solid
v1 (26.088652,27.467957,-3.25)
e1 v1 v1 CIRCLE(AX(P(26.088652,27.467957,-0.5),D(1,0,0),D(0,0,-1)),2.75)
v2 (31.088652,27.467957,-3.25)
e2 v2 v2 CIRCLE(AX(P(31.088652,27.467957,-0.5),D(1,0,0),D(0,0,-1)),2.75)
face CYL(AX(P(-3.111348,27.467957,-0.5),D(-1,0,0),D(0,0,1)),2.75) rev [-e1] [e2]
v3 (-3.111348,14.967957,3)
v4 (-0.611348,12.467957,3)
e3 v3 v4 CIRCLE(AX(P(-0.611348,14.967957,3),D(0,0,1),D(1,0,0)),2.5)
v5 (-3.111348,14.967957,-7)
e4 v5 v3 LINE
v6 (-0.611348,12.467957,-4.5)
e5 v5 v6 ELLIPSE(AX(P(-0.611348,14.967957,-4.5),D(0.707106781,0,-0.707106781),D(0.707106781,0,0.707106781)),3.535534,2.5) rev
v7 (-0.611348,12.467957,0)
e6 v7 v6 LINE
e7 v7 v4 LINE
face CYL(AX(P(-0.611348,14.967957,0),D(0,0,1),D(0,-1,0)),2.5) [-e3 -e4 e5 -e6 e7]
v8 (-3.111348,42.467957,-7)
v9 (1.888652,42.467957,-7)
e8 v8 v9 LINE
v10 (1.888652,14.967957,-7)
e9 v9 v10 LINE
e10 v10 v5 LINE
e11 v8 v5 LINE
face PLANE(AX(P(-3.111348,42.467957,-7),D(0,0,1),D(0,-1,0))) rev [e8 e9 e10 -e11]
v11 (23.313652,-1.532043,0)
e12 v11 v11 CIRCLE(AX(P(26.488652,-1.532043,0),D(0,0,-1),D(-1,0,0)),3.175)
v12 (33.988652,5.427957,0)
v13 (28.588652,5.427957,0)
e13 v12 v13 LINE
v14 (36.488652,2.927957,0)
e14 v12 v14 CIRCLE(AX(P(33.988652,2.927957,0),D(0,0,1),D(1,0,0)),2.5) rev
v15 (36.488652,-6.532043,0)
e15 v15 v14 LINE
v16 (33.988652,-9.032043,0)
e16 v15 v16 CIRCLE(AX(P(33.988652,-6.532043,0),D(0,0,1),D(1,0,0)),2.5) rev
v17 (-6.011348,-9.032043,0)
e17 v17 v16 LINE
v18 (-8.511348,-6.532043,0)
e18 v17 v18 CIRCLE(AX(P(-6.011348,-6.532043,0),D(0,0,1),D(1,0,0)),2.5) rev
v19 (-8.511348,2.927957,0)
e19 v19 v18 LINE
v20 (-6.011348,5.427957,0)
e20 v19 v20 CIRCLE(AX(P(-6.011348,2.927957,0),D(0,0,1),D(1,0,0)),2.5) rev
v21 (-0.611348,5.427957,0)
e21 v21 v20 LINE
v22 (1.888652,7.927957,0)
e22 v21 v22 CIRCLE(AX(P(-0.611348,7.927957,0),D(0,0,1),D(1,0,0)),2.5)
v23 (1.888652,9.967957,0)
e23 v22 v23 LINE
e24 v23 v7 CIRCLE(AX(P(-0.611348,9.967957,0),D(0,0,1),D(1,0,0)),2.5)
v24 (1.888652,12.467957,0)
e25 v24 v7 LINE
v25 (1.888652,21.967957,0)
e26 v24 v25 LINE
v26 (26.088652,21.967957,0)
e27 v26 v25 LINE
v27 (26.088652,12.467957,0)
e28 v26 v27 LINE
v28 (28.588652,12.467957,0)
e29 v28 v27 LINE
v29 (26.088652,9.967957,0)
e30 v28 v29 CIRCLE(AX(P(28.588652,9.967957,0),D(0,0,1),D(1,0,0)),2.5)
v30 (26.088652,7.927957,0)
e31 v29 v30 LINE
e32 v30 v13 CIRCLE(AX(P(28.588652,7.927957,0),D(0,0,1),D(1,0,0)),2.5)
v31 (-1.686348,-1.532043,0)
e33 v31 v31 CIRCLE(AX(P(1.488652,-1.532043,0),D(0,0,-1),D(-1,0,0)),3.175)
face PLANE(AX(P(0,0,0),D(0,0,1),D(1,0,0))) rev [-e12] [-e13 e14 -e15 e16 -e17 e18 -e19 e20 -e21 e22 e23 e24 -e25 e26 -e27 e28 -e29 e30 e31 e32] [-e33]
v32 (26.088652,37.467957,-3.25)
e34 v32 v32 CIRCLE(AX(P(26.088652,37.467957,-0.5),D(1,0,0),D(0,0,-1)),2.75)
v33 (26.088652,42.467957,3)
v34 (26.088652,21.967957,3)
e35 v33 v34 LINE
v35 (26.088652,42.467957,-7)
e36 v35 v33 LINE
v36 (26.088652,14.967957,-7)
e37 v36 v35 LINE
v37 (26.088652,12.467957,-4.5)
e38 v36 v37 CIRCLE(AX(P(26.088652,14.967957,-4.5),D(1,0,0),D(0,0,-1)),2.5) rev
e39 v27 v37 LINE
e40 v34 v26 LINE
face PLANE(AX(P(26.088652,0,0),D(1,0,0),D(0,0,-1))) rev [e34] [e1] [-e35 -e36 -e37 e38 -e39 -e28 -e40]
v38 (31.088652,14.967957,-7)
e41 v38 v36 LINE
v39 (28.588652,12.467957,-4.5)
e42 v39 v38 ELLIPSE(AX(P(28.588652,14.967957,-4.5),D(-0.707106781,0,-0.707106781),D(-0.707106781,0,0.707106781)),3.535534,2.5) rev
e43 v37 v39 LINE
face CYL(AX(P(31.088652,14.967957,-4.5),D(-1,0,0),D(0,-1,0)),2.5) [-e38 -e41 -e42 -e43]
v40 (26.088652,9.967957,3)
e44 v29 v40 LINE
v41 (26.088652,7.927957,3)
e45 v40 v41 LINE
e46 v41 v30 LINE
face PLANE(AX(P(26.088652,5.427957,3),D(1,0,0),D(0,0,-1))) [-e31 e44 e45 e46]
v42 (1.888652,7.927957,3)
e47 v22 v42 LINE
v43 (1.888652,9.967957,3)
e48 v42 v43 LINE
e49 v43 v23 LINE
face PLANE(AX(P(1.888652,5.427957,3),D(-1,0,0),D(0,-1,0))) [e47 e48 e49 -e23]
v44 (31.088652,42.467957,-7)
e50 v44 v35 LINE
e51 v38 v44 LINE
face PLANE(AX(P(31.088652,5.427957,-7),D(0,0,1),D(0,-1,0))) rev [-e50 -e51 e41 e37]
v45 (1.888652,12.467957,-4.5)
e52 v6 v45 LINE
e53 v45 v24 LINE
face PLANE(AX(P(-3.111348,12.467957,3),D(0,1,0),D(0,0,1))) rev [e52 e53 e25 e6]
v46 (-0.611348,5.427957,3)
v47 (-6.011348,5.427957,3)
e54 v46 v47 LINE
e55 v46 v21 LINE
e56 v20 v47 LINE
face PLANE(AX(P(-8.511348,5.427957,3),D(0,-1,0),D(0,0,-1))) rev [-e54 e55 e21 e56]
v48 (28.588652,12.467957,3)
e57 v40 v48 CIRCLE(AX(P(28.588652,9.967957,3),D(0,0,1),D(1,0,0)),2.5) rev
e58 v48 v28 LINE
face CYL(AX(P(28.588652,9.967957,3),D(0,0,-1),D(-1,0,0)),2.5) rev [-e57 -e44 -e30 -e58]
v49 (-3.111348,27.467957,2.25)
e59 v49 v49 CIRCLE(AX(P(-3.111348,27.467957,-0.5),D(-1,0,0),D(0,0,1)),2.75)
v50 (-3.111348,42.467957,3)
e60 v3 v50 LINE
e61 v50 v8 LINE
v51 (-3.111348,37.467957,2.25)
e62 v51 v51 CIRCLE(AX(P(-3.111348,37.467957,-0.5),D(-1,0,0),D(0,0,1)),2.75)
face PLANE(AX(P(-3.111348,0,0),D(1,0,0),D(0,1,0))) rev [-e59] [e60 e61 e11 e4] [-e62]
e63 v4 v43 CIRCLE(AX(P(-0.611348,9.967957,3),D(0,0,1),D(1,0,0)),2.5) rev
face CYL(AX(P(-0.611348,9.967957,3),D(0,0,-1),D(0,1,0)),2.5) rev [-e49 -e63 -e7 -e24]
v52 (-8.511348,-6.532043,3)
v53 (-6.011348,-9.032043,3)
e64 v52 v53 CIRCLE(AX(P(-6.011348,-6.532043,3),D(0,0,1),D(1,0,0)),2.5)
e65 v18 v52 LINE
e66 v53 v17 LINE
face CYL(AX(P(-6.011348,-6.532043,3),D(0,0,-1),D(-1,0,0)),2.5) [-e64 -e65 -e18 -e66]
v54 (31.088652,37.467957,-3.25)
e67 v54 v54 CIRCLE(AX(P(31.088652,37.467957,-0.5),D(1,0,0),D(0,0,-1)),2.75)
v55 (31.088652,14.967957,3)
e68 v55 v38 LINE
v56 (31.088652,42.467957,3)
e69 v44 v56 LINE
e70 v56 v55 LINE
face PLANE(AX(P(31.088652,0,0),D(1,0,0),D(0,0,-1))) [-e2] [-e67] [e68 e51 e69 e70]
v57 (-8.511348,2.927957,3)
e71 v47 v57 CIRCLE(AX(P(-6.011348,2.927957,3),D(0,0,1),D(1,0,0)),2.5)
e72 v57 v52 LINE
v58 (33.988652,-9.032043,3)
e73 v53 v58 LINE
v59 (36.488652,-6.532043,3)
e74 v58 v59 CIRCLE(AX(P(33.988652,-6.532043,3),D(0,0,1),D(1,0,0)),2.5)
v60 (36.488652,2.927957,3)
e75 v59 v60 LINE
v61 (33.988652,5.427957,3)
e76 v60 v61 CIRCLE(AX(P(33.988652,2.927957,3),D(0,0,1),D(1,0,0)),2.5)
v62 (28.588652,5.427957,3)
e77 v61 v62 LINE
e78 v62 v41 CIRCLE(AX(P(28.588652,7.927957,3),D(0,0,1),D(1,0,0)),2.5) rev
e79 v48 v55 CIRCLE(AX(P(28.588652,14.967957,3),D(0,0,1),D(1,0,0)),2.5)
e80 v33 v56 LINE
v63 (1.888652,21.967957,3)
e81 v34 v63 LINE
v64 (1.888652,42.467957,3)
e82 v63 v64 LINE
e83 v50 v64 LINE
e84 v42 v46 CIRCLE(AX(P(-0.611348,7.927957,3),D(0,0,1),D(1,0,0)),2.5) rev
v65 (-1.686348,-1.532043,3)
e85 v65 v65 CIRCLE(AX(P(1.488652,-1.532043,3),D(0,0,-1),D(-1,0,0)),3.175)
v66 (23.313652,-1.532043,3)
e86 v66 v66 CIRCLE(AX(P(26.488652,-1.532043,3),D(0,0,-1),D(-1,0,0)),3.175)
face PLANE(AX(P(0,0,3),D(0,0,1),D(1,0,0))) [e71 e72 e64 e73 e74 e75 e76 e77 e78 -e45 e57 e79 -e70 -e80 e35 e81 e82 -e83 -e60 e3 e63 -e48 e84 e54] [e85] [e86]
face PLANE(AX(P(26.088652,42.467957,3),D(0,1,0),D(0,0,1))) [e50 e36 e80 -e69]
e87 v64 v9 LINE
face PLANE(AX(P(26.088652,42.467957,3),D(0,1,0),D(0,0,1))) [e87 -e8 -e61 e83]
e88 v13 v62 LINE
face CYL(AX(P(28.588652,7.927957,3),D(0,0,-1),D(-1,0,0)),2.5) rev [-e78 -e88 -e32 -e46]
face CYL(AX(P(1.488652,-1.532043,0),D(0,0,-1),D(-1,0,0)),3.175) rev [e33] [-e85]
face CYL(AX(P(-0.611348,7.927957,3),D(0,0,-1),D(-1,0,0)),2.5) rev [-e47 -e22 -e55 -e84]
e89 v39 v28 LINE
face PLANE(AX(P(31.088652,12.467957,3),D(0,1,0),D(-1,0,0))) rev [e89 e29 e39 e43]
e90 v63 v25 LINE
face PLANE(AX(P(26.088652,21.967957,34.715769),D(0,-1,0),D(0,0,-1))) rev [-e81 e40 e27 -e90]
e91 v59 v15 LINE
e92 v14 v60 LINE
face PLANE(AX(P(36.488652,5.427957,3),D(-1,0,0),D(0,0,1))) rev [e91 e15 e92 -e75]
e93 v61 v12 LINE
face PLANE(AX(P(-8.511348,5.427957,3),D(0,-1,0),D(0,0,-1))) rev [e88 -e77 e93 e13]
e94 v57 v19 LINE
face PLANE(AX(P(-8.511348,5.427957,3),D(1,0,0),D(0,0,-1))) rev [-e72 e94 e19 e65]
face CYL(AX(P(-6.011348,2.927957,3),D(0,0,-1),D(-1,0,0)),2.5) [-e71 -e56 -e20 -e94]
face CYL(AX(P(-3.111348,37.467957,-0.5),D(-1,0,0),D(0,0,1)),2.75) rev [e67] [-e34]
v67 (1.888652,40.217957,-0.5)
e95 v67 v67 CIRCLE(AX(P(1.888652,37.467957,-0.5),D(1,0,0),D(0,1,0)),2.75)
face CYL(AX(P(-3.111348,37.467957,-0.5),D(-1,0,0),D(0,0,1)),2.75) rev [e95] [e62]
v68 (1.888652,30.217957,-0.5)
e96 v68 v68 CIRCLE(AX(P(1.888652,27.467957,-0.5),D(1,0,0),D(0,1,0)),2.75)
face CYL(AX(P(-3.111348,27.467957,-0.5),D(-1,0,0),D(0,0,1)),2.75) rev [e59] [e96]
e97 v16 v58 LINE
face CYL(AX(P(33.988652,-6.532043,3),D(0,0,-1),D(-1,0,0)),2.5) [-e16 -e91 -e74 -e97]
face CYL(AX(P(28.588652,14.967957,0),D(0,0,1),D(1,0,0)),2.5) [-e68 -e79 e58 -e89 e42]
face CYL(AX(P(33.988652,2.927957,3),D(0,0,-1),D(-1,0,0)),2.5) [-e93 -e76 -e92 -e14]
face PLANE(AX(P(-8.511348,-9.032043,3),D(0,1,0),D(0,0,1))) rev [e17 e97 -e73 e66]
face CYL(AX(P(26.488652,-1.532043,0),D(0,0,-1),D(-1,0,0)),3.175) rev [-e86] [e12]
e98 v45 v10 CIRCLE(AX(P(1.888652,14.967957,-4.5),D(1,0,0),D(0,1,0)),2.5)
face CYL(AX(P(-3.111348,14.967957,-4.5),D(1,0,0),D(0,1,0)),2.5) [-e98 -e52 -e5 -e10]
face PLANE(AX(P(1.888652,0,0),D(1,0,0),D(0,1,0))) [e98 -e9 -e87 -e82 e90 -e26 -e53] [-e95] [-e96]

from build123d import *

# Parameters (mm, degrees)
SKETCH1_W                   = 45
SKETCH1_H                   = 14.46
BOSS_EXTRUDE1_DEPTH         = 3
F_1_4_0_25_DIAMETER_HOLE1_D = 6.35
SKETCH5_W                   = 24.2
SKETCH5_H                   = 37.04
BOSS_EXTRUDE2_DEPTH         = 3
SKETCH6_W                   = 10
SKETCH6_H                   = 30
BOSS_EXTRUDE3_DEPTH         = 5
BOSS_EXTRUDE4_START         = -29.2
SKETCH7_W                   = 10
SKETCH7_H                   = 30
BOSS_EXTRUDE4_DEPTH         = 5
SKETCH12_W                  = 24.2
SKETCH12_H                  = 20.5
CUT_EXTRUDE1_DEPTH          = 3
M5_CLEARANCE_HOLE1_D        = 5.5
FILLET3_R                   = 2.5
FILLET4_R                   = 2.5


with BuildPart() as part:
    # Sketch1 → Boss-Extrude1 (new body)
    with BuildSketch(Plane.XY):
        with Locations((13.988651535, -1.802042724)):
            Rectangle(SKETCH1_W, SKETCH1_H)
    extrude(amount=BOSS_EXTRUDE1_DEPTH)

    # 1/4 (0.25) Diameter Hole1 (through all)
    with Locations(Plane(origin=(0, 0, 0), x_dir=(-1, 0, 0), z_dir=(0, 0, -1))):
        with Locations((-26.488651535, -1.532042724), (-1.488651535, -1.532042724)):
            Hole(F_1_4_0_25_DIAMETER_HOLE1_D / 2)

    # Sketch5 → Boss-Extrude2 (add)
    with BuildSketch(Plane(origin=(0, 0, 0), x_dir=(-1, 0, 0), z_dir=(0, 0, -1))):
        with Locations((-13.988651535, 23.947957276)):
            Rectangle(SKETCH5_W, SKETCH5_H)
    extrude(amount=-BOSS_EXTRUDE2_DEPTH)

    # Sketch6 → Boss-Extrude3 (add)
    with BuildSketch(Plane.ZY.offset(-1.888651535)):
        with Locations((-2, 27.467957276)):
            Rectangle(SKETCH6_W, SKETCH6_H)
    extrude(amount=BOSS_EXTRUDE3_DEPTH)

    # Sketch7 → Boss-Extrude4 (add)
    with BuildSketch(Plane.ZY.offset(3.111348465).offset(BOSS_EXTRUDE4_START)):
        with Locations((-2, 27.467957276)):
            Rectangle(SKETCH7_W, SKETCH7_H)
    extrude(amount=-BOSS_EXTRUDE4_DEPTH)

    # Sketch12 → Cut-Extrude1 (cut)
    with BuildSketch(Plane(origin=(0, 0, 0), x_dir=(-1, 0, 0), z_dir=(0, 0, -1))):
        with Locations((-13.988651535, 32.217957276)):
            Rectangle(SKETCH12_W, SKETCH12_H)
    extrude(amount=-CUT_EXTRUDE1_DEPTH, mode=Mode.SUBTRACT)

    # M5 Clearance Hole1 (through all)
    with Locations(Plane.ZY.offset(3.111348465)):
        with Locations((-0.5, 37.467957276), (-0.5, 27.467957276)):
            Hole(M5_CLEARANCE_HOLE1_D / 2)

    # Fillet3
    fillet3_edges = [part.edges().sort_by_distance(p)[0] for p in [
        (-8.511348465, 5.427957276, 1.5),
        (36.488651535, 5.427957276, 1.5),
        (36.488651535, -9.032042724, 1.5),
        (-8.511348465, -9.032042724, 1.5),
    ]]
    fillet(fillet3_edges, radius=FILLET3_R)

    # Fillet4
    fillet4_edges = [part.edges().sort_by_distance(p)[0] for p in [
        (1.888651535, 5.427957276, 1.5),
        (26.088651535, 5.427957276, 1.5),
        (26.088651535, 12.467957276, 1.5),
        (1.888651535, 12.467957276, 1.5),
        (31.088651535, 12.467957276, -2),
        (-3.111348465, 12.467957276, -2),
        (28.588651535, 12.467957276, -7),
        (-0.611348465, 12.467957276, -7),
    ]]
    fillet(fillet4_edges, radius=FILLET4_R - 0.0001)  # a hair under: the kernel refuses the full size


solid = part.part
